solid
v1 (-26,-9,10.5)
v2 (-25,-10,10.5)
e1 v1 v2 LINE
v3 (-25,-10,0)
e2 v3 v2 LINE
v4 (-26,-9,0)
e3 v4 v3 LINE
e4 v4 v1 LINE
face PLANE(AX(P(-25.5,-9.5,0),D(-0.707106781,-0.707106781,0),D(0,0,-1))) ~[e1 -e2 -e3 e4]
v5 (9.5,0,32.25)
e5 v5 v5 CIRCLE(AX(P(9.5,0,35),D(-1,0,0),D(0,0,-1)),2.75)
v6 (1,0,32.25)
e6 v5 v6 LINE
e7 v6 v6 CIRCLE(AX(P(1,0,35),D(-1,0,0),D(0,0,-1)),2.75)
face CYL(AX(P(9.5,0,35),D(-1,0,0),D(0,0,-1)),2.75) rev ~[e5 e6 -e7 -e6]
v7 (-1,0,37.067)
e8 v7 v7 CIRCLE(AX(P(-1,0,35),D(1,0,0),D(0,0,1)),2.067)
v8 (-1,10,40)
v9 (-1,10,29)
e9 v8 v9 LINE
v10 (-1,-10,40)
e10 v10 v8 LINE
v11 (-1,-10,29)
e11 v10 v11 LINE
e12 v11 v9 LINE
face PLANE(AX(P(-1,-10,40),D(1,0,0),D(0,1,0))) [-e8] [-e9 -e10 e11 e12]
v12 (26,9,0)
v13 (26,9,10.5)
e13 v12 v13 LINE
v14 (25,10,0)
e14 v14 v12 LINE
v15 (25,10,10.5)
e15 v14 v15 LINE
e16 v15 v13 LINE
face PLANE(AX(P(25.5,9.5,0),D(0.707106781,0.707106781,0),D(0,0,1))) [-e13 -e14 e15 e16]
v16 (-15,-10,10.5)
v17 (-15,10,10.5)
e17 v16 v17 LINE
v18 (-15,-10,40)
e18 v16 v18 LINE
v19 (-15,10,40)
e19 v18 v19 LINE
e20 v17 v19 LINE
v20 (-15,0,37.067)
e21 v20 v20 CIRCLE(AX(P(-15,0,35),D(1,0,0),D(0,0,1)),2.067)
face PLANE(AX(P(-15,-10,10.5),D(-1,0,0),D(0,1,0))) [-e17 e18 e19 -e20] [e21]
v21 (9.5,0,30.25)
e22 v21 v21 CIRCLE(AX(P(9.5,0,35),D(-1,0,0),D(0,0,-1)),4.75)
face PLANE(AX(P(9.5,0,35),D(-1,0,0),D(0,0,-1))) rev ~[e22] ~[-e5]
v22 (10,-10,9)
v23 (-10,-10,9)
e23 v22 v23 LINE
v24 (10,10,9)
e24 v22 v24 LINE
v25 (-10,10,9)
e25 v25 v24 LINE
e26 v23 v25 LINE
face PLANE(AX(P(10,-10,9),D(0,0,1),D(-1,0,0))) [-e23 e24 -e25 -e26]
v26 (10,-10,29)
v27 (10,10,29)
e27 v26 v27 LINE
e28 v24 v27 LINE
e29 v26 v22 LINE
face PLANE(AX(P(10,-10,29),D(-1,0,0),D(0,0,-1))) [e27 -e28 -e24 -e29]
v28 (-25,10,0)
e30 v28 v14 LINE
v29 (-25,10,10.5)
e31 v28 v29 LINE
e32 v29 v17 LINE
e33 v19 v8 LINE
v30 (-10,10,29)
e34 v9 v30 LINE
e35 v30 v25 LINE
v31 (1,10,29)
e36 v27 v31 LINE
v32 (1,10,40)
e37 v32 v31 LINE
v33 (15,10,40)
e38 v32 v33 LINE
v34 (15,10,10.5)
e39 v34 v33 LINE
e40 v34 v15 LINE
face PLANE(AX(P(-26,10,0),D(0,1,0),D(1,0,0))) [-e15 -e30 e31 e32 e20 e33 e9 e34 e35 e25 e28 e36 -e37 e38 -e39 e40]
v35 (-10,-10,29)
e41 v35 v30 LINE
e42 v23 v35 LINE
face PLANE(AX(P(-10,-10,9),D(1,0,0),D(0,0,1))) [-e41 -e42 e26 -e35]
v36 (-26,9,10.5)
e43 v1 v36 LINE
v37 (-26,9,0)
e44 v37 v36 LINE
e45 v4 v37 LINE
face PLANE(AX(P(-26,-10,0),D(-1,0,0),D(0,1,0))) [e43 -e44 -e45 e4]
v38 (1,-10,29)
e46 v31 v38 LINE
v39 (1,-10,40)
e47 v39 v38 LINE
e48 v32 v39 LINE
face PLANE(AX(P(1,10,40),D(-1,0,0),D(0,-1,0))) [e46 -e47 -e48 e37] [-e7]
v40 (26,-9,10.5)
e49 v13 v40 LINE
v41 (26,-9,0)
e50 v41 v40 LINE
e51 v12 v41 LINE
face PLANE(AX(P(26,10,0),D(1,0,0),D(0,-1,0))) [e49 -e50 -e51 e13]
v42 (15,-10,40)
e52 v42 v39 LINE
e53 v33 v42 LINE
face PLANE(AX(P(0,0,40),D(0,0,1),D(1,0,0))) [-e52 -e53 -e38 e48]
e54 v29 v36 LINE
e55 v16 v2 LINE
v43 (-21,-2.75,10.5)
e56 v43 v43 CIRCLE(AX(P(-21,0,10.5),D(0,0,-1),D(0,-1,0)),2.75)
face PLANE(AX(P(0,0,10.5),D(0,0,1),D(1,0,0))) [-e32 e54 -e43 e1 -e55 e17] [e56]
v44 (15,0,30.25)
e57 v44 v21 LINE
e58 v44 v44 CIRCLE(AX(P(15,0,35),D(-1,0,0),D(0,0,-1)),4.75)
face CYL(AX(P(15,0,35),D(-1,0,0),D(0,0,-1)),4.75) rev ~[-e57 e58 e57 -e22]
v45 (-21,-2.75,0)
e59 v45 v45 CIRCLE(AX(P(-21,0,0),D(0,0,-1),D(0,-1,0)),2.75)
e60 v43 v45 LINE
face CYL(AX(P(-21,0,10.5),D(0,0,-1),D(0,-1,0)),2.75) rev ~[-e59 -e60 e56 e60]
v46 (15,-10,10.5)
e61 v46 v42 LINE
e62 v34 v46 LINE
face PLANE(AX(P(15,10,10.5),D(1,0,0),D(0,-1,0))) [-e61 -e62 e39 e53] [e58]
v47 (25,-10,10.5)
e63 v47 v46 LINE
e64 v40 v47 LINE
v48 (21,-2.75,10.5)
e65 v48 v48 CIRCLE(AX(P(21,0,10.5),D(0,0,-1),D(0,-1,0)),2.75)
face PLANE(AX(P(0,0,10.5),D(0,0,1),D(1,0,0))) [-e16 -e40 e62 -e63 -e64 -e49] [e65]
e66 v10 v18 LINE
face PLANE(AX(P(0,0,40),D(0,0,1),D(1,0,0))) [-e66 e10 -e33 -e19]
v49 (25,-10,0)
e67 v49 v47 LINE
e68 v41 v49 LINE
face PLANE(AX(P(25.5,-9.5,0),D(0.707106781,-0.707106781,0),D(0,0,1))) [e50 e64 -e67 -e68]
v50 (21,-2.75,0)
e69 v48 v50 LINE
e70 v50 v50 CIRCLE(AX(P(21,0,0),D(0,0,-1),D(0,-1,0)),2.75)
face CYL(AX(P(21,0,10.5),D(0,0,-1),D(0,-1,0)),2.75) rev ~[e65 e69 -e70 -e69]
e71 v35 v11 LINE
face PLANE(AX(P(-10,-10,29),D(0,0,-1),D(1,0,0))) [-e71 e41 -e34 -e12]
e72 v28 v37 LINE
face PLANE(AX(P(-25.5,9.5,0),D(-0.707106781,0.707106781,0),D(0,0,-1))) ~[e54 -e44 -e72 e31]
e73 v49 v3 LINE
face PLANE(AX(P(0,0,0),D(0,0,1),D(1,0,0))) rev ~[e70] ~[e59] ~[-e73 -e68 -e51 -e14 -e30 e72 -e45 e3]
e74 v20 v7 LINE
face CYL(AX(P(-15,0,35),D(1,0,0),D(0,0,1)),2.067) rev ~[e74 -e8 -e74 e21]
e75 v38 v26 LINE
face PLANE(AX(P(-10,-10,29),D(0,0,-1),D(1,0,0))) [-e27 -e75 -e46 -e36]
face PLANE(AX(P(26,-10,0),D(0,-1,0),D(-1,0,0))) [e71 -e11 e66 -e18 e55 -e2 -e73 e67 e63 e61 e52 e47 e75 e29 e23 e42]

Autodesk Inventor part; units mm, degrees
ref_plane "YZ Plane" through (0, 0, 0) normal (1, 0, 0) x (0, 1, 0)
ref_plane "XZ Plane" through (0, 0, 0) normal (0, 1, 0) x (-1, 0, 0)
ref_plane "XY Plane" through (0, 0, 0) normal (0, 0, 1) x (1, 0, 0)
sketch "スケッチ1" plane through (0, 0, 0) normal (0, 0, 1) x (1, 0, 0)
  line L0 (-26, 10) -> (26, 10)
  line L1 (26, 10) -> (26, -10)
  line L2 (26, -10) -> (-26, -10)
  line L3 (-26, -10) -> (-26, 10)
  point P0 (0, 0)
  point P1 (0, -10)
  point P2 (-26, 0)
  dimension "d0" = 52
  dimension "d1" = 20
extrude "押し出し1" add sketch "スケッチ1" along normal blind 10.5
sketch "スケッチ2" plane through (0, 0, 10.5) normal (0, 0, 1) x (1, 0, 0)
  line L0 (-26, 10) -> (26, 10) projected
  line L1 (26, -10) -> (-26, -10) projected
  line L2 (-15, 10) -> (15, 10)
  line L3 (15, 10) -> (15, -10)
  line L4 (15, -10) -> (-15, -10)
  line L5 (-15, -10) -> (-15, 10)
  point P0 (0, 0)
  point P1 (0, -10)
  dimension "d4" = 30
extrude "押し出し2" add sketch "スケッチ2" along normal blind 29.5
sketch "スケッチ4" plane through (-26, -10, 0) normal (0, -1, 0) x (1, 0, 0)
  line L0 (52, 0) -> (0, 0) projected
  line L1 (16, 29) -> (36, 29)
  line L2 (36, 29) -> (36, 9)
  line L3 (36, 9) -> (16, 9)
  line L4 (16, 9) -> (16, 29)
  point P0 (26, 0)
  point P1 (26, 9)
  point P2 (26, 0)
  dimension "d8" = 20
  dimension "d9" = 20
  dimension "d10" = 9
extrude "押し出し3" cut sketch "スケッチ4" against normal through all
sketch "スケッチ5" plane through (0, 0, 40) normal (0, 0, 1) x (1, 0, 0)
  line L0 (-15, 10) -> (15, 10) projected
  line L1 (15, -10) -> (-15, -10) projected
  line L2 (-1, 10) -> (1, 10)
  line L3 (1, 10) -> (1, -10)
  line L4 (1, -10) -> (-1, -10)
  line L5 (-1, -10) -> (-1, 10)
  point P0 (0, 0)
  point P1 (0, -10)
  dimension "d13" = 2
extrude "押し出し4" cut sketch "スケッチ5" against normal up to surface (11 mm away)
sketch "スケッチ6" plane through (0, 0, 10.5) normal (0, 0, 1) x (1, 0, 0)
  line L0 (-26, -10) -> (-26, 10) projected
  line L1 (26, 10) -> (26, -10) projected
  point P0 (0, 0)
  point P1 (-21, 0)
  point P2 (21, 0)
  point P3 (-26, 0)
  dimension "d16" = 5
  dimension "d17" = 5
hole "穴1" at (-21, 0, 10.5) at (21, 0, 10.5) direction (0, 0, -1) diameter 5.5 end through all
sketch "スケッチ7" plane through (15, -10, 10.5) normal (1, 0, 0) x (0, 0, -1)
  line L0 (-29.5, 20) -> (-29.5, 0) projected
  line L1 (10.5, 12.75) -> (10.5, 7.25) projected
  point P0 (10.5, 10)
  point P1 (-24.5, 10)
  point P2 (-29.5, 10)
  dimension "d25" = 35
hole "穴2" at (15, 0, 35) direction (-1, 0, 0) diameter 5.5 end up to surface counterbore diameter 9.5 counterbore depth 5.5
sketch "スケッチ8" plane through (-15, -10, 10.5) normal (-1, 0, 0) x (0, 0, 1)
  circle A0 centre (24.5, 10) radius 2.75 projected
  point P0 (-10.5, 10)
hole "穴3" at (-15, 0, 35) direction (1, 0, 0) diameter 4.134 end up to surface thread size "M5x0.8" class "6H" standard "ANSI Metric M Profile"
chamfer "面取り1" distance 1 angle 45 4 edges at (-26, 10, 5.25) (26, 10, 5.25) (26, -10, 5.25) (-26, -10, 5.25)
equation "\"d9\" = d8"
equation "\"d17\" = d16"
properties part number "CLTQAM20" material "MISUMI"
